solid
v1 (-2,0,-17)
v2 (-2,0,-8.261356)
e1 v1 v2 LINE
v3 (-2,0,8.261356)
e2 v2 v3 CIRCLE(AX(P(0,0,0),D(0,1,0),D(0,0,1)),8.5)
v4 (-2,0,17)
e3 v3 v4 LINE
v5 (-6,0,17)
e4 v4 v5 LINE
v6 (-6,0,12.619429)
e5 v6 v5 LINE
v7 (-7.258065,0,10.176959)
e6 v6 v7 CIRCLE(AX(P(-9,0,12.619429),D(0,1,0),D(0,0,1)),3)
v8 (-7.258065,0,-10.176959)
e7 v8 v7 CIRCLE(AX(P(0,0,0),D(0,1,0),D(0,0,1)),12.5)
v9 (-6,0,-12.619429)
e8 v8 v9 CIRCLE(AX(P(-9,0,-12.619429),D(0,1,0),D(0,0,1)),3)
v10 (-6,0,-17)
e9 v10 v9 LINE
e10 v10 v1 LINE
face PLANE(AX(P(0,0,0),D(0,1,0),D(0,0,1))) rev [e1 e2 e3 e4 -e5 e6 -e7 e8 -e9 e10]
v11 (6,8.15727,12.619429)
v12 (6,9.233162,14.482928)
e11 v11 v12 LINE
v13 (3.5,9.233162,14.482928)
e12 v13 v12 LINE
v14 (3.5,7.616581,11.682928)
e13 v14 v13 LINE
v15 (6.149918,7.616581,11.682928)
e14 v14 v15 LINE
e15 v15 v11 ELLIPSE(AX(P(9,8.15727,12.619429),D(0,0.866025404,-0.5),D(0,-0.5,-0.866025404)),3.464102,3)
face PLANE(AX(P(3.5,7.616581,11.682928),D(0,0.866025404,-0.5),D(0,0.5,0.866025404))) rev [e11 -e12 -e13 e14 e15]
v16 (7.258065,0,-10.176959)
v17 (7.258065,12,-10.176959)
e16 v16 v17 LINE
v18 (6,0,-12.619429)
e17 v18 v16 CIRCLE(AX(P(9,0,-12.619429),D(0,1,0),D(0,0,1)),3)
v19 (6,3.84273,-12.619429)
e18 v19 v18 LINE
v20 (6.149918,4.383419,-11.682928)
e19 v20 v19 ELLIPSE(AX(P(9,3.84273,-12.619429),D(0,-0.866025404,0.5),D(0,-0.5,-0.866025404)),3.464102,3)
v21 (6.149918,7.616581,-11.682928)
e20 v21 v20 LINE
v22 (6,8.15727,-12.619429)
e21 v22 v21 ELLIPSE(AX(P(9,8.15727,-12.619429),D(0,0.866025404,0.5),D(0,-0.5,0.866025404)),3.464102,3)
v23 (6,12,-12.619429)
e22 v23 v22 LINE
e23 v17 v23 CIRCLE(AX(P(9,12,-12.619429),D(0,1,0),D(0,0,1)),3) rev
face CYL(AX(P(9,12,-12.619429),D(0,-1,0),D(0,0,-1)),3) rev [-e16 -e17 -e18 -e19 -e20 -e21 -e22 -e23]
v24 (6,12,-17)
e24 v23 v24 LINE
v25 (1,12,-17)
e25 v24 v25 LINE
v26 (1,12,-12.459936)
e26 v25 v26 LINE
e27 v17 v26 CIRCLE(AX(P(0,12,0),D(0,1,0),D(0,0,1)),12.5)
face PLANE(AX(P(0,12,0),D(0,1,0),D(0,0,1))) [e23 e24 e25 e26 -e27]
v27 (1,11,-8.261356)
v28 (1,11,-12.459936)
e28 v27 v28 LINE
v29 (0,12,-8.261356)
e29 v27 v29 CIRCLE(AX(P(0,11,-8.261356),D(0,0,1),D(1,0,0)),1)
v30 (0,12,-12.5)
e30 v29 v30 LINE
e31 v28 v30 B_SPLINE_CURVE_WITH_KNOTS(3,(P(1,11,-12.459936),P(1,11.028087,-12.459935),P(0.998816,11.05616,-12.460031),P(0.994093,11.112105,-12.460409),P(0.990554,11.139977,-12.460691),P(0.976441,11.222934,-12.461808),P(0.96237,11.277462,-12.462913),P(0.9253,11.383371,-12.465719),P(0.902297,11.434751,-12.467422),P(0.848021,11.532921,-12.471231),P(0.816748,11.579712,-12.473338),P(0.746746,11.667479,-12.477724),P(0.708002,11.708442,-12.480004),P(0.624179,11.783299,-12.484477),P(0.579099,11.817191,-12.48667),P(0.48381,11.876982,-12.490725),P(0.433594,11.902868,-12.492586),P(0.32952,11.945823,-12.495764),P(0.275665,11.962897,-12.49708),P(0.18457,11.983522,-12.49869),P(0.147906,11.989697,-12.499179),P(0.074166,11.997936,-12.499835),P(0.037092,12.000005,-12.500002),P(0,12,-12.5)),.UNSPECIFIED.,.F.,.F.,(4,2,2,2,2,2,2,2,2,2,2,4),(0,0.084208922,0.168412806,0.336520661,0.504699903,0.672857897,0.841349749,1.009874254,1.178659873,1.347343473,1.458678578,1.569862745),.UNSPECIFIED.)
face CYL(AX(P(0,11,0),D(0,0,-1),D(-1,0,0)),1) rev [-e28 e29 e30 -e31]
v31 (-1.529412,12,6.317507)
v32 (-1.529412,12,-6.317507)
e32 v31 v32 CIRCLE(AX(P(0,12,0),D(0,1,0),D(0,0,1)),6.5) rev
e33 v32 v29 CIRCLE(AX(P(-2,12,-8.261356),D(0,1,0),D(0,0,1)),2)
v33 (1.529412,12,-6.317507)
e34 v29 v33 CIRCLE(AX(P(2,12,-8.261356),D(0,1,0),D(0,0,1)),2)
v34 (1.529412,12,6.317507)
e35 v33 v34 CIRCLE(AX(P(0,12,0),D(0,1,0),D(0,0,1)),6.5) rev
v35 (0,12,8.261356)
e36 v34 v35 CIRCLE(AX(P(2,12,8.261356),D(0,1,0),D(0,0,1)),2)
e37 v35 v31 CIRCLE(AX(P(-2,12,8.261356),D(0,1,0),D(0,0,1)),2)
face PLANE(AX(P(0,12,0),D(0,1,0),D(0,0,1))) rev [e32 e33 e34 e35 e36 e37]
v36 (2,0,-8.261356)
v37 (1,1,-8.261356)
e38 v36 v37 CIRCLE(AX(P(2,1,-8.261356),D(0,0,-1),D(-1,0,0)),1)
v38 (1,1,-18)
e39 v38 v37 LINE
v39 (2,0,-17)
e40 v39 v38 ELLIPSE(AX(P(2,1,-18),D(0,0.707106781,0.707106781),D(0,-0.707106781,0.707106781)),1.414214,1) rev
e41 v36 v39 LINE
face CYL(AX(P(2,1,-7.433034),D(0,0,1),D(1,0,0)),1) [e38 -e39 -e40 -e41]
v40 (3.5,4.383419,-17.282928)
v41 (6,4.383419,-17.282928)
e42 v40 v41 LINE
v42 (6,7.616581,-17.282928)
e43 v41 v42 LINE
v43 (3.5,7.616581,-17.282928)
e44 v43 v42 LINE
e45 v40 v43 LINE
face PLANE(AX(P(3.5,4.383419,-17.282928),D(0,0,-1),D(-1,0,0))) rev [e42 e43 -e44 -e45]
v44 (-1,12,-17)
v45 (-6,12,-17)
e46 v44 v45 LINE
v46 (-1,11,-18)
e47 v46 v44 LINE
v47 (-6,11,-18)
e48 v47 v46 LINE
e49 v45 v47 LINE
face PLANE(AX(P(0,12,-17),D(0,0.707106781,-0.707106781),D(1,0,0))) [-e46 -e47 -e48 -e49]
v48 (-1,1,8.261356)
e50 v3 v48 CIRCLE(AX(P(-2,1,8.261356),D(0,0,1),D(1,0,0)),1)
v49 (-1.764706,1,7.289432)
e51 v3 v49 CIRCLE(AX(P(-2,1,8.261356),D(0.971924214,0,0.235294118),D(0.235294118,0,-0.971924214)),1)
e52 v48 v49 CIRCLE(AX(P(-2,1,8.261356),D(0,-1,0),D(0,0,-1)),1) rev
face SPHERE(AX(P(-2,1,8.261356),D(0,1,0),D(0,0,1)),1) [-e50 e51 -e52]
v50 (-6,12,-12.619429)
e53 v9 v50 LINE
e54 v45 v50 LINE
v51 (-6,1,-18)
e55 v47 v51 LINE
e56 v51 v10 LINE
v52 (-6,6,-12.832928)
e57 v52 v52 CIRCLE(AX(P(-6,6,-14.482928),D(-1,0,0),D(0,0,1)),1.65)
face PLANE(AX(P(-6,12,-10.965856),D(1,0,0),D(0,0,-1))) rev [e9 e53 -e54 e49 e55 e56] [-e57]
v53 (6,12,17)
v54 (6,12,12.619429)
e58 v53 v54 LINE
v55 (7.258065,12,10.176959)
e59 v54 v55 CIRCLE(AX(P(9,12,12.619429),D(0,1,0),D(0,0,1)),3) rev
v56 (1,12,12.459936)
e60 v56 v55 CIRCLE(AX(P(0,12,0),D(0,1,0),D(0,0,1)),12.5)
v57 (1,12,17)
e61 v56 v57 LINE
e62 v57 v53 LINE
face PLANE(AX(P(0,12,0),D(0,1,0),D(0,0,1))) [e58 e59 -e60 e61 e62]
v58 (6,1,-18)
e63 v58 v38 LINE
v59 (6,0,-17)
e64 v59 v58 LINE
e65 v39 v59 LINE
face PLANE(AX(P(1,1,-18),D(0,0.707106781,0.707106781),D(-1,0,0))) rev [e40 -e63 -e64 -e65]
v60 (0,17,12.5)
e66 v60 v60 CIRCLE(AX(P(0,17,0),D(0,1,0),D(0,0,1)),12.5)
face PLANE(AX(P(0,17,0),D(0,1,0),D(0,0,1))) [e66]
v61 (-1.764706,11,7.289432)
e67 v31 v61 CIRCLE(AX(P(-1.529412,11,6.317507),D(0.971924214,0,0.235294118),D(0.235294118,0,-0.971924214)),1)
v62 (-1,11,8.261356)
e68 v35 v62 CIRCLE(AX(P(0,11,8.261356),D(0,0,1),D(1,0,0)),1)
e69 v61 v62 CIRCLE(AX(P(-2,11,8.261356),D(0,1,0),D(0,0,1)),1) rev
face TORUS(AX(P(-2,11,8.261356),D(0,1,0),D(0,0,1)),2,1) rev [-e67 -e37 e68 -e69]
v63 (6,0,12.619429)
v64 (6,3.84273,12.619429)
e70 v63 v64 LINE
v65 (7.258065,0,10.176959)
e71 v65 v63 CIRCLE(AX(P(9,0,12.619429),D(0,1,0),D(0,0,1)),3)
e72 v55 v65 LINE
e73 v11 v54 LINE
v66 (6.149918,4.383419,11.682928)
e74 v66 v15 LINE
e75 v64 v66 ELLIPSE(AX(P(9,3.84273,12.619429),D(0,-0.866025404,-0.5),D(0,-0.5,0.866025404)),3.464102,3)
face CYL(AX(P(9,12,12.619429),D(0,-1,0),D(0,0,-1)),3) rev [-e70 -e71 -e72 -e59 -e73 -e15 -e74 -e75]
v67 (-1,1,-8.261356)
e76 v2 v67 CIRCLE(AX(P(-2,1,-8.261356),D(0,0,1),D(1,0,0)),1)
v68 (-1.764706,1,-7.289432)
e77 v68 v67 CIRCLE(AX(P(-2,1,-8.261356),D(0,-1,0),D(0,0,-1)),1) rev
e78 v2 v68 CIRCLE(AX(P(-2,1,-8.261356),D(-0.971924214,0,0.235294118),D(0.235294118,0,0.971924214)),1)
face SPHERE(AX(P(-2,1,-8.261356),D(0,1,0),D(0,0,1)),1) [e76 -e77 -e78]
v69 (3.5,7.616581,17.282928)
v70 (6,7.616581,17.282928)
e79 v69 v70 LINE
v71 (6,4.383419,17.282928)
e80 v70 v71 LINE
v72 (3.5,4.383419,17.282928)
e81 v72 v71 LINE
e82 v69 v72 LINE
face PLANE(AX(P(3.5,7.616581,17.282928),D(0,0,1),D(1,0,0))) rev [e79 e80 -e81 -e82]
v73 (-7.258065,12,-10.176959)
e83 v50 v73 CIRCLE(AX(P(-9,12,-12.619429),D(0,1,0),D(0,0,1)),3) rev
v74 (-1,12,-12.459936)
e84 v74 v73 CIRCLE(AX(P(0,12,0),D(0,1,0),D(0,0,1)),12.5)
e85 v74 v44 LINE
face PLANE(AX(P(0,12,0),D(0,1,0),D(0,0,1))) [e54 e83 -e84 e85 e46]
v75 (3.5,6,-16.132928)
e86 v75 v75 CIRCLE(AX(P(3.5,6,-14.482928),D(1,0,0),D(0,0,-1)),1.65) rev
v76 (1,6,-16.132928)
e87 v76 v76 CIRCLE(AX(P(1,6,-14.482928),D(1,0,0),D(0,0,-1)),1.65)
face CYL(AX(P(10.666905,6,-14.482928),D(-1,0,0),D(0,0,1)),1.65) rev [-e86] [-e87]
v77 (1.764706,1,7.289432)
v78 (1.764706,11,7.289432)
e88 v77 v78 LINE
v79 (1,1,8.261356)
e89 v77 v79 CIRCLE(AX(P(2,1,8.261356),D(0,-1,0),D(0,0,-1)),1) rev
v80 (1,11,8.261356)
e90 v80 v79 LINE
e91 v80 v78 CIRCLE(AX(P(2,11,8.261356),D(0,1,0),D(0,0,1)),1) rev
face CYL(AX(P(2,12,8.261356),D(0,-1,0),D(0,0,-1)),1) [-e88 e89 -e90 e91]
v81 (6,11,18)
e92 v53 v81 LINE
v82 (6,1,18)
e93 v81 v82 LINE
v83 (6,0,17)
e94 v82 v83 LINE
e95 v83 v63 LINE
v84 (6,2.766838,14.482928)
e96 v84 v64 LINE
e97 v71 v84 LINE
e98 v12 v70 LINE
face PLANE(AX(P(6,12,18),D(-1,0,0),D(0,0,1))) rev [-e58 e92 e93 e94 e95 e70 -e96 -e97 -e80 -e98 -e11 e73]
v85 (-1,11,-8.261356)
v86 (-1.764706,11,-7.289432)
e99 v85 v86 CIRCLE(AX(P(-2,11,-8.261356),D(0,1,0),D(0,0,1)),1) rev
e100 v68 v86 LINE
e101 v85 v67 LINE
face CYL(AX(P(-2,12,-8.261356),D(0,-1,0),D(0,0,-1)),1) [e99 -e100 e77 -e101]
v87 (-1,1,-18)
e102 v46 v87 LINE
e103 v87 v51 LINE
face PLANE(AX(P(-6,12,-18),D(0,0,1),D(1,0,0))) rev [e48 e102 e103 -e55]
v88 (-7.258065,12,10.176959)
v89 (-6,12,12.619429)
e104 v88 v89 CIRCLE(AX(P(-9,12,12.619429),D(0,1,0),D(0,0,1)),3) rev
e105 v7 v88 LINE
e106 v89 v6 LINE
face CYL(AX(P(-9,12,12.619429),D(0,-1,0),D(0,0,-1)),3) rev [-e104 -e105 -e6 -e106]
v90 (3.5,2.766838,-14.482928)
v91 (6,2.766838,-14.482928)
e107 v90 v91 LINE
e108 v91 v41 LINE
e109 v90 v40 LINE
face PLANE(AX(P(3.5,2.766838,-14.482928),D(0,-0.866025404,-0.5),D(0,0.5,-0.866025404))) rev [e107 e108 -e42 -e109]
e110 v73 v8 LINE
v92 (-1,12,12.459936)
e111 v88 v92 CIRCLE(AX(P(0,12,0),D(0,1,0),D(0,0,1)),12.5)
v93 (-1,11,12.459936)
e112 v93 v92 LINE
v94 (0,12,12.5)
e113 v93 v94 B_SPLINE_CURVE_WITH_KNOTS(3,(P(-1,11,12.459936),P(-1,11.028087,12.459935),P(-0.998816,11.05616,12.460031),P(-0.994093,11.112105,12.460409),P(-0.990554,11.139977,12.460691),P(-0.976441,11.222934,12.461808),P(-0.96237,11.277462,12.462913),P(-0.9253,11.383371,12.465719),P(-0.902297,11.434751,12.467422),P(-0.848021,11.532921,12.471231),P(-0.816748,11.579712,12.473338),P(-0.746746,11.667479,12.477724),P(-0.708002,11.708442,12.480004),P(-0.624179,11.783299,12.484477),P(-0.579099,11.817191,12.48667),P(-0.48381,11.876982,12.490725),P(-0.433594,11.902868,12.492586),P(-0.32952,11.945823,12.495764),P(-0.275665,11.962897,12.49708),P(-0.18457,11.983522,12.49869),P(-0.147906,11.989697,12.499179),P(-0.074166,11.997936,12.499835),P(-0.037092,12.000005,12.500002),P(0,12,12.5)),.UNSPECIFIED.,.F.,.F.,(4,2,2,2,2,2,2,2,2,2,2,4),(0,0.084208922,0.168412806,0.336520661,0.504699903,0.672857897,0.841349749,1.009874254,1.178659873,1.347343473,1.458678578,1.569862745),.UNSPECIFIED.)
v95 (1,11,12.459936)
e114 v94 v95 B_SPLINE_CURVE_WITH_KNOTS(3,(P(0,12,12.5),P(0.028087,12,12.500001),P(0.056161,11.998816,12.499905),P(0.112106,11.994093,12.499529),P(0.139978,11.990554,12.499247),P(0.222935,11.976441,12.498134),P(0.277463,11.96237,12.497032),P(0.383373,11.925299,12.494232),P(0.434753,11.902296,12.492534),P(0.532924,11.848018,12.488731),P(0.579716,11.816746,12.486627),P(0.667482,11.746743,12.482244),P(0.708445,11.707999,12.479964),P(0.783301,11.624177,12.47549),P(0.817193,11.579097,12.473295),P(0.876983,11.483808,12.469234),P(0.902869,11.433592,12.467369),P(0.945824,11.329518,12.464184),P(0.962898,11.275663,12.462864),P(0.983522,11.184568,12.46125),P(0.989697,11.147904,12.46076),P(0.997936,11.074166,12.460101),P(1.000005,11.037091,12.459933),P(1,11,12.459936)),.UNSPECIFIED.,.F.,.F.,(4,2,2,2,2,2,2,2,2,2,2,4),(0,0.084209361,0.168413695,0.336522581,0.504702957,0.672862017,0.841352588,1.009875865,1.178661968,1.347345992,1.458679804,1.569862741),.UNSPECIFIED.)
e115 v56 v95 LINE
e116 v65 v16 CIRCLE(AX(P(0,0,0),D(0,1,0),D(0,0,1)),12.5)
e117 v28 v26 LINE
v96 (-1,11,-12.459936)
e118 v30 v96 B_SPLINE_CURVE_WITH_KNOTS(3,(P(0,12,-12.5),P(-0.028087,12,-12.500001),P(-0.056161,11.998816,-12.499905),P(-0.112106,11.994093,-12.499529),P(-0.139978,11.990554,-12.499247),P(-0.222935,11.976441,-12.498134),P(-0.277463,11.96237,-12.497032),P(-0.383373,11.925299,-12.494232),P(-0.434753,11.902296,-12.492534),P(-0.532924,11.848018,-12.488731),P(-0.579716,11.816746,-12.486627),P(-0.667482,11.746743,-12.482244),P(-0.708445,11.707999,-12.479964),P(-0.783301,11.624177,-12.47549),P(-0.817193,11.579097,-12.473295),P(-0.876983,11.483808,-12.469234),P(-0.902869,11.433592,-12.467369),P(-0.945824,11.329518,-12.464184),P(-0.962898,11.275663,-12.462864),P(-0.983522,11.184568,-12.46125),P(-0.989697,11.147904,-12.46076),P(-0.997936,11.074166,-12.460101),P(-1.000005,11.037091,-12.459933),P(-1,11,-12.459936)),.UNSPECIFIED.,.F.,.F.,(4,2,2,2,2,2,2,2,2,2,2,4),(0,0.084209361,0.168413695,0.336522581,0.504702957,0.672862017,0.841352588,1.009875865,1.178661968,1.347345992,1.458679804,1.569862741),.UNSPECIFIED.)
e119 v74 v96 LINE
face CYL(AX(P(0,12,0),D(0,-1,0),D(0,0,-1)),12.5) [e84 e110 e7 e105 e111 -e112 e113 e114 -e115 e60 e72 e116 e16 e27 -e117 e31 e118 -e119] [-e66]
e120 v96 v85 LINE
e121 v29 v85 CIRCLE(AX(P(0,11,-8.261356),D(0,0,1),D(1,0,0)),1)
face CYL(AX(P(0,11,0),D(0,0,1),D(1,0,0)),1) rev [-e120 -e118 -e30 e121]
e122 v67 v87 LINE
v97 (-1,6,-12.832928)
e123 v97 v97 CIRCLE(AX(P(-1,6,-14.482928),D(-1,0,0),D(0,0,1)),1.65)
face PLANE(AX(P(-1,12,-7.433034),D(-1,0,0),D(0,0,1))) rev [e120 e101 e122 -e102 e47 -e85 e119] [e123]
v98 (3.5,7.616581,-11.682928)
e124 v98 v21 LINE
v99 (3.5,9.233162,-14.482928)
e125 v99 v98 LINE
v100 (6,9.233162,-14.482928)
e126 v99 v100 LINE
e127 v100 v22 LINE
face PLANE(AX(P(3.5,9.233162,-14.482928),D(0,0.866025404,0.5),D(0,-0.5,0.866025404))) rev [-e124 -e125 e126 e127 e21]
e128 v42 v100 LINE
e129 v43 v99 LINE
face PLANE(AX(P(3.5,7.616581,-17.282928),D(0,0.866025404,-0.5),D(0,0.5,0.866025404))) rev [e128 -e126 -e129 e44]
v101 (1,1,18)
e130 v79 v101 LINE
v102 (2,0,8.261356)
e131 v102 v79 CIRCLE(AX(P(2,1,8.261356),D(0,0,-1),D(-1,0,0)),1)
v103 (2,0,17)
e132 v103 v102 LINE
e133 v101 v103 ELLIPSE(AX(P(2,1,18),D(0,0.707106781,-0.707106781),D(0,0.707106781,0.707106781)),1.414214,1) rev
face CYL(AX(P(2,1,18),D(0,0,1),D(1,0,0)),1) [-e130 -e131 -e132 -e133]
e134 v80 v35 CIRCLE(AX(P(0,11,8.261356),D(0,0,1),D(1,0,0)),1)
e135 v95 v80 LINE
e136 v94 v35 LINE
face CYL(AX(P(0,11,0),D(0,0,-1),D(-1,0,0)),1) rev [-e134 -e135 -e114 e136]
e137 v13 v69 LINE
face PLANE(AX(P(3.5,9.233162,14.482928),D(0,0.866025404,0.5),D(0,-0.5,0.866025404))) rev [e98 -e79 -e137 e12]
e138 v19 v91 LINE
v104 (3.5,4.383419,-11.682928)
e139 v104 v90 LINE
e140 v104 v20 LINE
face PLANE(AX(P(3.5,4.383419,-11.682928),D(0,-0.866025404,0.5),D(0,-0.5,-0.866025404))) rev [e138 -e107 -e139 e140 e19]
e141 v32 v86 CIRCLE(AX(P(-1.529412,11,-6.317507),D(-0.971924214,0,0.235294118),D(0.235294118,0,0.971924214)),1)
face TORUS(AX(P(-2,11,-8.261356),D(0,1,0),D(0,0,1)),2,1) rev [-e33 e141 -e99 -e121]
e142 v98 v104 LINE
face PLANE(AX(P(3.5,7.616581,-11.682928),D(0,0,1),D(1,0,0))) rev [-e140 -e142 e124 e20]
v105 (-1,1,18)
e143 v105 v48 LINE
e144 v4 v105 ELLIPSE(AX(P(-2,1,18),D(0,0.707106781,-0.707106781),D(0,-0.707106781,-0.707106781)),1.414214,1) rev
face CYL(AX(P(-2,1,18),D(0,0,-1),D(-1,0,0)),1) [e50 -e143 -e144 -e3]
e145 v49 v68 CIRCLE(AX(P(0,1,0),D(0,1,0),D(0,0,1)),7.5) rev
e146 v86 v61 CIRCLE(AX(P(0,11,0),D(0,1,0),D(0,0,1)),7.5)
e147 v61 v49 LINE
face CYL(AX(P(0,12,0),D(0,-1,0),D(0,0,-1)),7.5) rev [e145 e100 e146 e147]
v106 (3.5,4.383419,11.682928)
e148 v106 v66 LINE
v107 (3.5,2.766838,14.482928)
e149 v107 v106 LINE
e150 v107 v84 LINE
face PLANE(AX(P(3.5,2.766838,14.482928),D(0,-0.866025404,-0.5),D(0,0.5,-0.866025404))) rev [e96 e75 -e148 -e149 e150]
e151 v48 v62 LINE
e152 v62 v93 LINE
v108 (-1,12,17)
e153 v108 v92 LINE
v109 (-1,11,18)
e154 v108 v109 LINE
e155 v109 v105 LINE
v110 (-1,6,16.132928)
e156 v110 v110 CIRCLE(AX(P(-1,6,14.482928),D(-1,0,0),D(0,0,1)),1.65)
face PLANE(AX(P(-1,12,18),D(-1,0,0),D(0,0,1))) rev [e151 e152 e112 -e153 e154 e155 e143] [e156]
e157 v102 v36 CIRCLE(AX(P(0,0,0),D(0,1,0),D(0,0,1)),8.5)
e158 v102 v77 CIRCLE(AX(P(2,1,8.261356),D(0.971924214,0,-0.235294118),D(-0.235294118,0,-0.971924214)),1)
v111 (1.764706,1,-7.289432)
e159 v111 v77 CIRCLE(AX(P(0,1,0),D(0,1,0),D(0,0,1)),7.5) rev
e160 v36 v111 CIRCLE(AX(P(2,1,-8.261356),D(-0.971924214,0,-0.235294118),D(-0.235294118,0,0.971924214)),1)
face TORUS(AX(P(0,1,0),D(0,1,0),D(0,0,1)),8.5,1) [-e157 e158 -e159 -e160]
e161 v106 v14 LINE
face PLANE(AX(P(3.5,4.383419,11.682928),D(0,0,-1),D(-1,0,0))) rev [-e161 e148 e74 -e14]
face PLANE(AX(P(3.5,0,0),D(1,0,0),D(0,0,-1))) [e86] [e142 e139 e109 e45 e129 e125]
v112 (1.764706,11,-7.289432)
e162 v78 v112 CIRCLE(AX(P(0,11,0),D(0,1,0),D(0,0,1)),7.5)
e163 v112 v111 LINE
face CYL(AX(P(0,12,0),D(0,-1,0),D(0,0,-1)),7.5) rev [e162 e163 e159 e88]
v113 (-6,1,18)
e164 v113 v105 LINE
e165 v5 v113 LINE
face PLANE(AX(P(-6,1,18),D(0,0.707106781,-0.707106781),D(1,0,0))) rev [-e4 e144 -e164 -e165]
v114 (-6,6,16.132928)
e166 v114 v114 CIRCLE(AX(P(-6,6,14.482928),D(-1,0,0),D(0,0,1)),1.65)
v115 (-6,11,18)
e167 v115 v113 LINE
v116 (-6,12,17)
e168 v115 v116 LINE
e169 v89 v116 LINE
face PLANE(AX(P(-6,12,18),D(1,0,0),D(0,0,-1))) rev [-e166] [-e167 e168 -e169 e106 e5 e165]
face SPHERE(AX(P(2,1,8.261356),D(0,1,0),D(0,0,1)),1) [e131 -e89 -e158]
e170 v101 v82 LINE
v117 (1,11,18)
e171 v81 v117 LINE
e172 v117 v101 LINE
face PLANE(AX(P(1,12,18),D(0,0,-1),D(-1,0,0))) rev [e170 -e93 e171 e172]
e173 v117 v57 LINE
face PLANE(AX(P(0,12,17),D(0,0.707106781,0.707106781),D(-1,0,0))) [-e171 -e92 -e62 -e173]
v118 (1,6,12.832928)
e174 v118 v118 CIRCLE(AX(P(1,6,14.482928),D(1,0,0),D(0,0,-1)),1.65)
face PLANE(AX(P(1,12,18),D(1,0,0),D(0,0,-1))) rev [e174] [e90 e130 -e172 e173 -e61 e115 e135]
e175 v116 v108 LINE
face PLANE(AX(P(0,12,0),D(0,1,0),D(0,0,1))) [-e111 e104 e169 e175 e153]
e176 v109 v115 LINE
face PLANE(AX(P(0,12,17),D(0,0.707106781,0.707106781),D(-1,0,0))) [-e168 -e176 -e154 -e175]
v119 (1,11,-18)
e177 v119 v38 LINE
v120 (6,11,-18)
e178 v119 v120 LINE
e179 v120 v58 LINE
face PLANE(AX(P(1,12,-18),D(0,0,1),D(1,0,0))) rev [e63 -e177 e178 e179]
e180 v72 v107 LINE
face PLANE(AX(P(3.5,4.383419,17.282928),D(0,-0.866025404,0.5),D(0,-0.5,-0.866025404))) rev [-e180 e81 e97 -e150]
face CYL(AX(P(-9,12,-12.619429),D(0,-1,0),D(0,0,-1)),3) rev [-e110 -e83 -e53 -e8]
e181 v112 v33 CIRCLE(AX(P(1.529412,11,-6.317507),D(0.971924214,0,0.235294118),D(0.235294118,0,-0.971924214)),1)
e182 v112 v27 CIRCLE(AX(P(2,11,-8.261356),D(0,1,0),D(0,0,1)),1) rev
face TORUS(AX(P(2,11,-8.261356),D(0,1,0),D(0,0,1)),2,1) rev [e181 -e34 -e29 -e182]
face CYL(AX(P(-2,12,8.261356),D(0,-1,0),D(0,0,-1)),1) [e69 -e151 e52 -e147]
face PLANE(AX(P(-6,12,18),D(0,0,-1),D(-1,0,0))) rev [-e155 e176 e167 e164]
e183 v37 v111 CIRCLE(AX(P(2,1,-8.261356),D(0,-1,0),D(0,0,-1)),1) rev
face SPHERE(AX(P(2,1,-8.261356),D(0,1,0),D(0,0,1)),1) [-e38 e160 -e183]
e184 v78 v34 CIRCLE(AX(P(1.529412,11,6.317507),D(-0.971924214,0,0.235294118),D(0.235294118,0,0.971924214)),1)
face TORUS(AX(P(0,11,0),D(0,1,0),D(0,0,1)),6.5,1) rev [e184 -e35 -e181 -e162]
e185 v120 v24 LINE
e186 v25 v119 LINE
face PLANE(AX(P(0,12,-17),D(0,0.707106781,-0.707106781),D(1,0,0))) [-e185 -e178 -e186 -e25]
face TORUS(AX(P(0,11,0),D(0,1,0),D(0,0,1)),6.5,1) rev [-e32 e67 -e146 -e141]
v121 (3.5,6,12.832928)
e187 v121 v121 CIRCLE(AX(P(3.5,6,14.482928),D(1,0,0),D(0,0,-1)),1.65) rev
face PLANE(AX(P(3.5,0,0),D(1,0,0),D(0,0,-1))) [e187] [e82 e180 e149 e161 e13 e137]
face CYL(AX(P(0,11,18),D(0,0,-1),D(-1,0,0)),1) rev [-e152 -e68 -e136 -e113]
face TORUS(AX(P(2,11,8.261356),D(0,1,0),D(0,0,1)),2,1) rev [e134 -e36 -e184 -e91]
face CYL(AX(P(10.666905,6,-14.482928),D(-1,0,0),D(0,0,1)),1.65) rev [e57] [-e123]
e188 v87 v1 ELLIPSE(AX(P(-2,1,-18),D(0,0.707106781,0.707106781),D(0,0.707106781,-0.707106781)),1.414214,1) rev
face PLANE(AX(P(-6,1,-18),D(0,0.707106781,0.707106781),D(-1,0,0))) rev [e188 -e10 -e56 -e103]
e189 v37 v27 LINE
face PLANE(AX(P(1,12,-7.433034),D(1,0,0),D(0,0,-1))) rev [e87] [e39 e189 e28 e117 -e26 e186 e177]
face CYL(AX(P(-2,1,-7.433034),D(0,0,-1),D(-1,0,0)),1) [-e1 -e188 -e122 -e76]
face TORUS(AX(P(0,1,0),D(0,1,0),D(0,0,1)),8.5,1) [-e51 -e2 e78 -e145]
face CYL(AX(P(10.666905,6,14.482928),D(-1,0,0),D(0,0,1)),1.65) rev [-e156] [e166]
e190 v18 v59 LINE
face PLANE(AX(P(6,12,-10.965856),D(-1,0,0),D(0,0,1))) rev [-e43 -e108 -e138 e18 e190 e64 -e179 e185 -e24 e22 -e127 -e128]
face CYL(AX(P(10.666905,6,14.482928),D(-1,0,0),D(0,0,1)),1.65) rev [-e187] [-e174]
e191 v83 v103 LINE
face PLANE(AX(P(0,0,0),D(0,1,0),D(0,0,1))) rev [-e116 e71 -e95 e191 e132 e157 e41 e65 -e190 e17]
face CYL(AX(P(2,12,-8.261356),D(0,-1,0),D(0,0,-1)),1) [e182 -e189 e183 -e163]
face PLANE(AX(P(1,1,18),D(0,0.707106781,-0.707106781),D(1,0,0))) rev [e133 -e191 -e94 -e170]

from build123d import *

# Parameters (mm, degrees)
BOSS_EXTRUDE1_DEPTH   = 12
BOSS_EXTRUDE1_2_DEPTH = 12
SKETCH2_R             = 12.5
BOSS_EXTRUDE2_DEPTH   = 5
CUT_EXTRUDE1_REACH    = 32.907
SKETCH4_R             = 1.65
CUT_EXTRUDE2_DEPTH    = 2.5
CHAMFER1_SIZE         = 1
FILLET1_R             = 3
FILLET2_R             = 1
FILLET3_R             = 1


with BuildPart() as part:
    # Sketch1 → Boss-Extrude1 (new body)
    with BuildSketch(Plane(origin=(0, 0, 0), x_dir=(1, 0, 0), z_dir=(0, 1, 0))):
        with BuildLine():
            Line((-6, 10.9658561), (-6, 18))
            Line((-6, 18), (-1, 18))
            Line((-1, 18), (-1, 7.433034374))
            ThreePointArc((-1, 7.433034374), (-7.5, 0), (-1, -7.433034374))
            Line((-1, -7.433034374), (-1, -18))
            Line((-1, -18), (-6, -18))
            Line((-6, -18), (-6, -10.9658561))
            ThreePointArc((-6, -10.9658561), (-12.5, 0), (-6, 10.9658561))
        make_face()
    extrude(amount=BOSS_EXTRUDE1_DEPTH)



with BuildPart() as body_2:
    # Sketch1 → Boss-Extrude1 2 (new body)
    with BuildSketch(Plane(origin=(0, 0, 0), x_dir=(1, 0, 0), z_dir=(0, 1, 0))):
        with BuildLine():
            Line((6, -18), (6, -10.9658561))
            ThreePointArc((6, -10.9658561), (12.5, 0), (6, 10.9658561))
            Line((6, 10.9658561), (6, 18))
            Line((6, 18), (1, 18))
            Line((1, 18), (1, 7.433034374))
            ThreePointArc((1, 7.433034374), (7.5, 0), (1, -7.433034374))
            Line((1, -7.433034374), (1, -18))
            Line((1, -18), (6, -18))
        make_face()
    extrude(amount=BOSS_EXTRUDE1_2_DEPTH)


with BuildPart() as part_1:
    add(part.part)

    add(body_2.part)  # Boss-Extrude2 merges body 2
    # Sketch2 → Boss-Extrude2 (add)
    with BuildSketch(Plane(origin=(0, 12, 0), x_dir=(1, 0, 0), z_dir=(0, 1, 0))):
        with Locations(Location((0, 0, 0), (0, 0, 85.411434264))):
            Circle(SKETCH2_R)
    extrude(amount=BOSS_EXTRUDE2_DEPTH)

    # Cut-Extrude1: up to this face of the body (flat: up to its plane)
    cut_extrude1_end = Plane(part_1.part.faces().sort_by_distance((6, 6, 14.48292805))[0])
    # Sketch4 → Cut-Extrude1 (cut, up to the picked face)
    with BuildSketch(Plane.ZY.offset(6), mode=Mode.PRIVATE) as cut_extrude1_sk1:
        with Locations((-14.48292805, 6)):
            Circle(SKETCH4_R)
    cut_extrude1_tool1 = split(extrude(cut_extrude1_sk1.sketch, amount=-CUT_EXTRUDE1_REACH, mode=Mode.PRIVATE), bisect_by=cut_extrude1_end, keep=Keep.BOTH, mode=Mode.PRIVATE)
    # Sketch4 → Cut-Extrude1 (cut, up to the picked face)
    with BuildSketch(Plane.ZY.offset(6), mode=Mode.PRIVATE) as cut_extrude1_sk2:
        with Locations((14.48292805, 6)):
            Circle(SKETCH4_R)
    cut_extrude1_tool2 = split(extrude(cut_extrude1_sk2.sketch, amount=-CUT_EXTRUDE1_REACH, mode=Mode.PRIVATE), bisect_by=cut_extrude1_end, keep=Keep.BOTH, mode=Mode.PRIVATE)
    add(cut_extrude1_tool1.solids().sort_by(Axis((-6, 6, -14.482928), (1, 0, 0)))[0], mode=Mode.SUBTRACT)
    add(cut_extrude1_tool2.solids().sort_by(Axis((-6, 6, 14.482928), (1, 0, 0)))[0], mode=Mode.SUBTRACT)

    # Sketch5 → Cut-Extrude2 (cut)
    with BuildSketch(Plane(origin=(6, 0, 0), x_dir=(0, 0, -1), z_dir=(1, 0, 0))):
        Polygon((-14.48292805, 9.233161507), (-17.28292805, 7.616580754), (-17.28292805, 4.383419246), (-14.48292805, 2.766838493), (-11.68292805, 4.383419246), (-11.68292805, 7.616580754), align=None)
        Polygon((14.48292805, 9.233161507), (11.68292805, 7.616580754), (11.68292805, 4.383419246), (14.48292805, 2.766838493), (17.28292805, 4.383419246), (17.28292805, 7.616580754), align=None)
    extrude(amount=-CUT_EXTRUDE2_DEPTH, mode=Mode.SUBTRACT)

    # Chamfer1
    chamfer1_edges = [part_1.edges().sort_by_distance(p)[0] for p in [
        (3.5, 0, 18),
        (3.5, 12, 18),
        (3.5, 12, -18),
        (-3.5, 12, -18),
        (-3.5, 0, 18),
        (-3.5, 0, -18),
        (-3.5, 12, 18),
        (3.5, 0, -18),
    ]]
    chamfer(chamfer1_edges, length=CHAMFER1_SIZE)

    # Fillet1
    # the kernel refuses this fillet: 3 mm, written as the material it adds along each edge
    with BuildSketch(Plane(origin=(-6, 0, 10.9658561), x_dir=(-0.8472084674167688, 0, -0.5312605883531453), z_dir=(0, 1, 0))) as fillet1_piece_1:
        with BuildLine():
            CenterArc((1.663147044, 2.994703121), FILLET1_R, 212.090667332, 54.50406735)
            Line((-0.878478358, 1.400921356), (0, 0))
            ThreePointArc((0, 0), (0.742476359, 0.02207033), (1.484952718, 0))
        make_face()
    extrude(amount=12)
    with BuildSketch(Plane(origin=(-6, 0, -10.9658561), x_dir=(0, 0, -1), z_dir=(0, 1, 0))) as fillet1_piece_2:
        with BuildLine():
            CenterArc((1.653573364, 3), FILLET1_R, 215.49593265, 54.50406735)
            ThreePointArc((-0.788896854, 1.258064516), (-0.375750257, 0.640757354), (0, 0))
            Line((0, 0), (1.653573364, 0))
        make_face()
    extrude(amount=12)
    with BuildSketch(Plane(origin=(6, 0, 10.9658561), x_dir=(0.8472084674167693, 0, -0.5312605883531445), z_dir=(0, 1, 0))) as fillet1_piece_3_section:
        with BuildLine():
            CenterArc((1.663147044, -2.994703121), FILLET1_R, 93.405265318, 54.50406735)
            Line((-0.878478358, -1.400921356), (0, 0))
            ThreePointArc((0, 0), (0.742476359, -0.02207033), (1.484952718, 0))
        make_face()
    fillet1_piece_3 = extrude(amount=12, mode=Mode.PRIVATE)
    fillet1_piece_3 = split(fillet1_piece_3, bisect_by=Plane(origin=(6.337461172, 2.39460816, 11.68292805), z_dir=(0, 0, -1)), keep=Keep.TOP, mode=Mode.PRIVATE)
    fillet1_piece_3 = split(fillet1_piece_3, bisect_by=Plane(origin=(6.337461172, 4.190564283, 12.016962645), z_dir=(0, -0.8660254037844386, -0.5000000000000002)), keep=Keep.TOP, mode=Mode.PRIVATE)
    add(fillet1_piece_3)
    with BuildSketch(Plane(origin=(6, 0, 10.9658561), x_dir=(0.8472084674167693, 0, -0.5312605883531445), z_dir=(0, 1, 0))) as fillet1_piece_4_section:
        with BuildLine():
            CenterArc((1.663147044, -2.994703121), FILLET1_R, 93.405265318, 54.50406735)
            Line((-0.878478358, -1.400921356), (0, 0))
            ThreePointArc((0, 0), (0.742476359, -0.02207033), (1.484952718, 0))
        make_face()
    fillet1_piece_4 = extrude(amount=12, mode=Mode.PRIVATE)
    fillet1_piece_4 = split(fillet1_piece_4, bisect_by=Plane(origin=(6.004610603, 2.08996972, 11.68292805), z_dir=(0, 0, 1)), keep=Keep.TOP, mode=Mode.PRIVATE)
    fillet1_piece_4 = split(fillet1_piece_4, bisect_by=Plane(origin=(6.004610603, 3.657447011, 12.940348845), z_dir=(0, -0.8660254037844386, -0.5000000000000002)), keep=Keep.TOP, mode=Mode.PRIVATE)
    add(fillet1_piece_4)
    with BuildSketch(Plane(origin=(6, 0, 10.9658561), x_dir=(0.8472084674167693, 0, -0.5312605883531445), z_dir=(0, 1, 0))) as fillet1_piece_5_section:
        with BuildLine():
            CenterArc((1.663147044, -2.994703121), FILLET1_R, 93.405265318, 54.50406735)
            Line((-0.878478358, -1.400921356), (0, 0))
            ThreePointArc((0, 0), (0.742476359, -0.02207033), (1.484952718, 0))
        make_face()
    fillet1_piece_5 = extrude(amount=12, mode=Mode.PRIVATE)
    fillet1_piece_5 = split(fillet1_piece_5, bisect_by=Plane(origin=(6.283099083, 6.940912679, 10.512636616), z_dir=(0, -0.8660254037844385, 0.5000000000000004)), keep=Keep.TOP, mode=Mode.PRIVATE)
    fillet1_piece_5 = split(fillet1_piece_5, bisect_by=Plane(origin=(6.283099083, 6, 11.68292805), z_dir=(0, 0, -1)), keep=Keep.TOP, mode=Mode.PRIVATE)
    fillet1_piece_5 = split(fillet1_piece_5, bisect_by=Plane(origin=(6.283099083, 5.059087321, 10.512636616), z_dir=(0, 0.8660254037844386, 0.5000000000000002)), keep=Keep.TOP, mode=Mode.PRIVATE)
    add(fillet1_piece_5)
    with BuildSketch(Plane(origin=(6, 0, 10.9658561), x_dir=(0.8472084674167693, 0, -0.5312605883531445), z_dir=(0, 1, 0))) as fillet1_piece_6_section:
        with BuildLine():
            CenterArc((1.663147044, -2.994703121), FILLET1_R, 93.405265318, 54.50406735)
            Line((-0.878478358, -1.400921356), (0, 0))
            ThreePointArc((0, 0), (0.742476359, -0.02207033), (1.484952718, 0))
        make_face()
    fillet1_piece_6 = extrude(amount=12, mode=Mode.PRIVATE)
    fillet1_piece_6 = split(fillet1_piece_6, bisect_by=Plane(origin=(6.337461172, 7.809435717, 12.016962645), z_dir=(0, 0.8660254037844385, -0.5000000000000004)), keep=Keep.TOP, mode=Mode.PRIVATE)
    fillet1_piece_6 = split(fillet1_piece_6, bisect_by=Plane(origin=(6.337461172, 9.60539184, 11.68292805), z_dir=(0, 0, -1)), keep=Keep.TOP, mode=Mode.PRIVATE)
    add(fillet1_piece_6)
    with BuildSketch(Plane(origin=(6, 0, 10.9658561), x_dir=(0.8472084674167693, 0, -0.5312605883531445), z_dir=(0, 1, 0))) as fillet1_piece_7_section:
        with BuildLine():
            CenterArc((1.663147044, -2.994703121), FILLET1_R, 93.405265318, 54.50406735)
            Line((-0.878478358, -1.400921356), (0, 0))
            ThreePointArc((0, 0), (0.742476359, -0.02207033), (1.484952718, 0))
        make_face()
    fillet1_piece_7 = extrude(amount=12, mode=Mode.PRIVATE)
    fillet1_piece_7 = split(fillet1_piece_7, bisect_by=Plane(origin=(6.004610603, 8.342552989, 12.940348845), z_dir=(0, 0.8660254037844385, -0.5000000000000004)), keep=Keep.TOP, mode=Mode.PRIVATE)
    fillet1_piece_7 = split(fillet1_piece_7, bisect_by=Plane(origin=(6.004610603, 9.91003028, 11.68292805), z_dir=(0, 0, 1)), keep=Keep.TOP, mode=Mode.PRIVATE)
    add(fillet1_piece_7)
    with BuildSketch(Plane(origin=(6, 0, -10.9658561), x_dir=(0.8472084674167686, 0, 0.5312605883531455), z_dir=(0, 1, 0))) as fillet1_piece_8_section:
        with BuildLine():
            CenterArc((1.663147044, 2.994703121), FILLET1_R, 212.090667332, 54.50406735)
            Line((-0.878478358, 1.400921356), (0, 0))
            ThreePointArc((0, 0), (0.742476359, 0.02207033), (1.484952718, 0))
        make_face()
    fillet1_piece_8 = extrude(amount=12, mode=Mode.PRIVATE)
    fillet1_piece_8 = split(fillet1_piece_8, bisect_by=Plane(origin=(6.337461172, 4.190564283, -12.016962645), z_dir=(0, -0.8660254037844386, 0.5000000000000002)), keep=Keep.TOP, mode=Mode.PRIVATE)
    fillet1_piece_8 = split(fillet1_piece_8, bisect_by=Plane(origin=(6.337461172, 2.39460816, -11.68292805), z_dir=(0, 0, 1)), keep=Keep.TOP, mode=Mode.PRIVATE)
    add(fillet1_piece_8)
    with BuildSketch(Plane(origin=(6, 0, -10.9658561), x_dir=(0.8472084674167686, 0, 0.5312605883531455), z_dir=(0, 1, 0))) as fillet1_piece_9_section:
        with BuildLine():
            CenterArc((1.663147044, 2.994703121), FILLET1_R, 212.090667332, 54.50406735)
            Line((-0.878478358, 1.400921356), (0, 0))
            ThreePointArc((0, 0), (0.742476359, 0.02207033), (1.484952718, 0))
        make_face()
    fillet1_piece_9 = extrude(amount=12, mode=Mode.PRIVATE)
    fillet1_piece_9 = split(fillet1_piece_9, bisect_by=Plane(origin=(6.004610603, 3.657447011, -12.940348845), z_dir=(0, -0.8660254037844386, 0.5000000000000002)), keep=Keep.TOP, mode=Mode.PRIVATE)
    fillet1_piece_9 = split(fillet1_piece_9, bisect_by=Plane(origin=(6.004610603, 2.08996972, -11.68292805), z_dir=(0, 0, -1)), keep=Keep.TOP, mode=Mode.PRIVATE)
    add(fillet1_piece_9)
    with BuildSketch(Plane(origin=(6, 0, -10.9658561), x_dir=(0.8472084674167686, 0, 0.5312605883531455), z_dir=(0, 1, 0))) as fillet1_piece_10_section:
        with BuildLine():
            CenterArc((1.663147044, 2.994703121), FILLET1_R, 212.090667332, 54.50406735)
            Line((-0.878478358, 1.400921356), (0, 0))
            ThreePointArc((0, 0), (0.742476359, 0.02207033), (1.484952718, 0))
        make_face()
    fillet1_piece_10 = extrude(amount=12, mode=Mode.PRIVATE)
    fillet1_piece_10 = split(fillet1_piece_10, bisect_by=Plane(origin=(6.283099083, 5.059087321, -10.512636616), z_dir=(0, 0.8660254037844386, -0.5000000000000002)), keep=Keep.TOP, mode=Mode.PRIVATE)
    fillet1_piece_10 = split(fillet1_piece_10, bisect_by=Plane(origin=(6.283099083, 6, -11.68292805), z_dir=(0, 0, 1)), keep=Keep.TOP, mode=Mode.PRIVATE)
    fillet1_piece_10 = split(fillet1_piece_10, bisect_by=Plane(origin=(6.283099083, 6.940912679, -10.512636616), z_dir=(0, -0.8660254037844386, -0.5000000000000002)), keep=Keep.TOP, mode=Mode.PRIVATE)
    add(fillet1_piece_10)
    with BuildSketch(Plane(origin=(6, 0, -10.9658561), x_dir=(0.8472084674167686, 0, 0.5312605883531455), z_dir=(0, 1, 0))) as fillet1_piece_11_section:
        with BuildLine():
            CenterArc((1.663147044, 2.994703121), FILLET1_R, 212.090667332, 54.50406735)
            Line((-0.878478358, 1.400921356), (0, 0))
            ThreePointArc((0, 0), (0.742476359, 0.02207033), (1.484952718, 0))
        make_face()
    fillet1_piece_11 = extrude(amount=12, mode=Mode.PRIVATE)
    fillet1_piece_11 = split(fillet1_piece_11, bisect_by=Plane(origin=(6.337461172, 9.60539184, -11.68292805), z_dir=(0, 0, 1)), keep=Keep.TOP, mode=Mode.PRIVATE)
    fillet1_piece_11 = split(fillet1_piece_11, bisect_by=Plane(origin=(6.337461172, 7.809435717, -12.016962645), z_dir=(0, 0.8660254037844386, 0.5000000000000002)), keep=Keep.TOP, mode=Mode.PRIVATE)
    add(fillet1_piece_11)
    with BuildSketch(Plane(origin=(6, 0, -10.9658561), x_dir=(0.8472084674167686, 0, 0.5312605883531455), z_dir=(0, 1, 0))) as fillet1_piece_12_section:
        with BuildLine():
            CenterArc((1.663147044, 2.994703121), FILLET1_R, 212.090667332, 54.50406735)
            Line((-0.878478358, 1.400921356), (0, 0))
            ThreePointArc((0, 0), (0.742476359, 0.02207033), (1.484952718, 0))
        make_face()
    fillet1_piece_12 = extrude(amount=12, mode=Mode.PRIVATE)
    fillet1_piece_12 = split(fillet1_piece_12, bisect_by=Plane(origin=(6.004610603, 9.91003028, -11.68292805), z_dir=(0, 0, -1)), keep=Keep.TOP, mode=Mode.PRIVATE)
    fillet1_piece_12 = split(fillet1_piece_12, bisect_by=Plane(origin=(6.004610603, 8.342552989, -12.940348845), z_dir=(0, 0.8660254037844386, 0.5000000000000002)), keep=Keep.TOP, mode=Mode.PRIVATE)
    add(fillet1_piece_12)

    # Fillet2
    fillet2_edges = [part_1.edges().sort_by_distance(p)[0] for p in [
        (1, 6, -7.433034374),
        (1, 6, 7.433034374),
        (-1, 6, 7.433034374),
        (-1, 6, -7.433034374),
    ]]
    fillet(fillet2_edges, radius=FILLET2_R)

    # Fillet3
    # the kernel refuses this fillet: 1 mm, written as the material it adds along each edge
    with BuildSketch(Plane(origin=(1, 12, -14.959935794), x_dir=(0, -1, 0), z_dir=(0, 0, 1))) as fillet3_piece_1_section:
        with BuildLine():
            CenterArc((FILLET3_R, -FILLET3_R), FILLET3_R, 90, 90)
            Line((0, -FILLET3_R), (0, 0))
            Line((0, 0), (FILLET3_R, 0))
        make_face()
    fillet3_piece_1 = extrude(amount=6.698579973, mode=Mode.PRIVATE)
    fillet3_piece_1 = fillet3_piece_1 & Plane(origin=(0, 11.776915092, 0), x_dir=(0.08000000000372605, 0, -0.99679486354987), z_dir=(0, -1, 0)) * Cylinder(12.5, 18, mode=Mode.PRIVATE)
    add(fillet3_piece_1)
    with BuildSketch(Plane(origin=(2, 12, -8.261355821), x_dir=(-1, 0, 0), z_dir=(0, 0, -1))) as fillet3_piece_2:
        with BuildLine():
            CenterArc((1 + FILLET3_R, -FILLET3_R), FILLET3_R, 90, 90)
            Line((1 + FILLET3_R, 0), (1, 0))
            Line((1, 0), (1, -FILLET3_R))
        make_face()
    revolve(axis=Axis((2, 12, -8.261355821), (0, 1, 0)), revolution_arc=76.391039369)
    with BuildSketch(Plane(origin=(1, 12, 8.261355821), x_dir=(-1, 0, 0), z_dir=(0, 0, 1))) as fillet3_piece_3_section:
        with BuildLine():
            CenterArc((FILLET3_R, FILLET3_R), FILLET3_R, 180, 90)
            Line((0, FILLET3_R), (0, 0))
            Line((0, 0), (FILLET3_R, 0))
        make_face()
    fillet3_piece_3 = extrude(amount=6.698579973, mode=Mode.PRIVATE)
    fillet3_piece_3 = fillet3_piece_3 & Plane(origin=(0, 11.77691513, 0), x_dir=(0.08000000000372605, 0, -0.99679486354987), z_dir=(0, -1, 0)) * Cylinder(12.5, 18, mode=Mode.PRIVATE)
    add(fillet3_piece_3)
    with BuildSketch(Plane(origin=(2, 12, 8.261355821), x_dir=(-1, 0, 0), z_dir=(0, 0, 1))) as fillet3_piece_4:
        with BuildLine():
            CenterArc((1 + FILLET3_R, FILLET3_R), FILLET3_R, 180, 90)
            Line((1, FILLET3_R), (1, 0))
            Line((1, 0), (1 + FILLET3_R, 0))
        make_face()
    revolve(axis=Axis((2, 12, 8.261355821), (0, -1, 0)), revolution_arc=76.391039369)
    with BuildSketch(Plane(origin=(-1, 12, 8.261355821), x_dir=(1, 0, 0), z_dir=(0, 0, 1))) as fillet3_piece_5_section:
        with BuildLine():
            CenterArc((FILLET3_R, -FILLET3_R), FILLET3_R, 90, 90)
            Line((0, -FILLET3_R), (0, 0))
            Line((0, 0), (FILLET3_R, 0))
        make_face()
    fillet3_piece_5 = extrude(amount=6.698579973, mode=Mode.PRIVATE)
    fillet3_piece_5 = fillet3_piece_5 & Plane(origin=(0, 11.77691513, 0), x_dir=(0.08000000000372605, 0, -0.99679486354987), z_dir=(0, -1, 0)) * Cylinder(12.5, 18, mode=Mode.PRIVATE)
    add(fillet3_piece_5)
    with BuildSketch(Plane(origin=(-2, 12, 8.261355821), x_dir=(1, 0, 0), z_dir=(0, 0, 1))) as fillet3_piece_6:
        with BuildLine():
            CenterArc((1 + FILLET3_R, -FILLET3_R), FILLET3_R, 90, 90)
            Line((1, -FILLET3_R), (1, 0))
            Line((1, 0), (1 + FILLET3_R, 0))
        make_face()
    revolve(axis=Axis((-2, 12, 8.261355821), (0, 1, 0)), revolution_arc=76.391039369)
    with BuildSketch(Plane(origin=(-1, 12, -14.959935794), x_dir=(1, 0, 0), z_dir=(0, 0, 1))) as fillet3_piece_7_section:
        with BuildLine():
            CenterArc((FILLET3_R, -FILLET3_R), FILLET3_R, 90, 90)
            Line((0, -FILLET3_R), (0, 0))
            Line((0, 0), (FILLET3_R, 0))
        make_face()
    fillet3_piece_7 = extrude(amount=6.698579973, mode=Mode.PRIVATE)
    fillet3_piece_7 = fillet3_piece_7 & Plane(origin=(0, 11.77691513, 0), x_dir=(0.08000000000372605, 0, -0.99679486354987), z_dir=(0, -1, 0)) * Cylinder(12.5, 18, mode=Mode.PRIVATE)
    add(fillet3_piece_7)
    with BuildSketch(Plane(origin=(-2, 12, -8.261355821), x_dir=(1, 0, 0), z_dir=(0, 0, -1))) as fillet3_piece_8:
        with BuildLine():
            CenterArc((1 + FILLET3_R, FILLET3_R), FILLET3_R, 180, 90)
            Line((1, FILLET3_R), (1, 0))
            Line((1, 0), (1 + FILLET3_R, 0))
        make_face()
    revolve(axis=Axis((-2, 12, -8.261355821), (0, -1, 0)), revolution_arc=76.391039369)
    with BuildSketch(Plane(origin=(0, 12, 0), x_dir=(0.23529411764705882, 0, -0.9719242142269592), z_dir=(-0.9719242142269592, 0, -0.23529411764705882))) as fillet3_piece_9:
        with BuildLine():
            CenterArc((7.5 - FILLET3_R, FILLET3_R), FILLET3_R, 270, 90)
            Line((7.5, FILLET3_R), (7.5, 0))
            Line((7.5, 0), (7.5 - FILLET3_R, 0))
        make_face()
    revolve(axis=Axis((0, 12, 0), (0, -1, 0)), revolution_arc=152.782078738)
    with BuildSketch(Plane(origin=(0, 12, 0), x_dir=(-0.235294117647059, 0, -0.9719242142269591), z_dir=(0.9719242142269591, 0, -0.235294117647059))) as fillet3_piece_10:
        with BuildLine():
            CenterArc((7.5 - FILLET3_R, -FILLET3_R), FILLET3_R, 0, 90)
            Line((7.5, -FILLET3_R), (7.5, 0))
            Line((7.5, 0), (7.5 - FILLET3_R, 0))
        make_face()
    revolve(axis=Axis((0, 12, 0), (0, 1, 0)), revolution_arc=152.782078738)
    # the kernel refuses this fillet: 1 mm, written as the material it takes off along each edge
    with BuildSketch(Plane(origin=(1, 0, -19.5), x_dir=(0, 1, 0), z_dir=(0, 0, 1)), Plane(origin=(-1, 0, 8.261355821), x_dir=(-1, 0, 0), z_dir=(0, 0, 1))) as fillet3_2_piece_1:
        with BuildLine():
            CenterArc((FILLET3_R, -FILLET3_R), FILLET3_R, 90, 90)
            Line((0, -FILLET3_R), (0, 0))
            Line((0, 0), (FILLET3_R, 0))
        make_face()
    extrude(amount=11.238644179, mode=Mode.SUBTRACT)
    with BuildSketch(Plane(origin=(2, 0, -8.261355821), x_dir=(-1, 0, 0), z_dir=(0, 0, -1))) as fillet3_2_piece_2:
        with BuildLine():
            CenterArc((1 - FILLET3_R, FILLET3_R), FILLET3_R, 270, 90)
            Line((1 - FILLET3_R, 0), (1, 0))
            Line((1, 0), (1, FILLET3_R))
        make_face()
    revolve(axis=Axis((2, 0, -8.261355821), (0, 1, 0)), revolution_arc=76.391039369, mode=Mode.SUBTRACT)
    with BuildSketch(Plane(origin=(1, 0, 8.261355821), x_dir=(1, 0, 0), z_dir=(0, 0, 1)), Plane(origin=(-1, 0, -19.5), x_dir=(0, 1, 0), z_dir=(0, 0, 1))) as fillet3_2_piece_3:
        with BuildLine():
            CenterArc((FILLET3_R, FILLET3_R), FILLET3_R, 180, 90)
            Line((0, FILLET3_R), (0, 0))
            Line((0, 0), (FILLET3_R, 0))
        make_face()
    extrude(amount=11.238644179, mode=Mode.SUBTRACT)
    with BuildSketch(Plane(origin=(2, 0, 8.261355821), x_dir=(-1, 0, 0), z_dir=(0, 0, 1))) as fillet3_2_piece_4:
        with BuildLine():
            CenterArc((1 - FILLET3_R, -FILLET3_R), FILLET3_R, 0, 90)
            Line((1, -FILLET3_R), (1, 0))
            Line((1, 0), (1 - FILLET3_R, 0))
        make_face()
    revolve(axis=Axis((2, 0, 8.261355821), (0, -1, 0)), revolution_arc=76.391039369, mode=Mode.SUBTRACT)
    with BuildSketch(Plane(origin=(-2, 0, 8.261355821), x_dir=(1, 0, 0), z_dir=(0, 0, 1))) as fillet3_2_piece_5:
        with BuildLine():
            CenterArc((1 - FILLET3_R, FILLET3_R), FILLET3_R, 270, 90)
            Line((1, FILLET3_R), (1, 0))
            Line((1, 0), (1 - FILLET3_R, 0))
        make_face()
    revolve(axis=Axis((-2, 0, 8.261355821), (0, 1, 0)), revolution_arc=76.391039369, mode=Mode.SUBTRACT)
    with BuildSketch(Plane(origin=(-2, 0, -8.261355821), x_dir=(1, 0, 0), z_dir=(0, 0, -1))) as fillet3_2_piece_6:
        with BuildLine():
            CenterArc((1 - FILLET3_R, -FILLET3_R), FILLET3_R, 0, 90)
            Line((1 - FILLET3_R, 0), (1, 0))
            Line((1, 0), (1, -FILLET3_R))
        make_face()
    revolve(axis=Axis((-2, 0, -8.261355821), (0, -1, 0)), revolution_arc=76.391039369, mode=Mode.SUBTRACT)
    with BuildSketch(Plane(origin=(0, 0, 0), x_dir=(0.23529411764705874, 0, -0.9719242142269593), z_dir=(-0.9719242142269593, 0, -0.23529411764705874))) as fillet3_2_piece_7:
        with BuildLine():
            CenterArc((7.5 + FILLET3_R, -FILLET3_R), FILLET3_R, 90, 90)
            Line((7.5, -FILLET3_R), (7.5, 0))
            Line((7.5, 0), (7.5 + FILLET3_R, 0))
        make_face()
    revolve(axis=Axis((0, 0, 0), (0, -1, 0)), revolution_arc=152.782078738, mode=Mode.SUBTRACT)
    with BuildSketch(Plane(origin=(0, 0, 0), x_dir=(-0.23529411764705896, 0, -0.9719242142269592), z_dir=(0.9719242142269592, 0, -0.23529411764705896))) as fillet3_2_piece_8:
        with BuildLine():
            CenterArc((7.5 + FILLET3_R, FILLET3_R), FILLET3_R, 180, 90)
            Line((7.5, FILLET3_R), (7.5, 0))
            Line((7.5, 0), (7.5 + FILLET3_R, 0))
        make_face()
    revolve(axis=Axis((0, 0, 0), (0, 1, 0)), revolution_arc=152.782078738, mode=Mode.SUBTRACT)


solid = part_1.part
